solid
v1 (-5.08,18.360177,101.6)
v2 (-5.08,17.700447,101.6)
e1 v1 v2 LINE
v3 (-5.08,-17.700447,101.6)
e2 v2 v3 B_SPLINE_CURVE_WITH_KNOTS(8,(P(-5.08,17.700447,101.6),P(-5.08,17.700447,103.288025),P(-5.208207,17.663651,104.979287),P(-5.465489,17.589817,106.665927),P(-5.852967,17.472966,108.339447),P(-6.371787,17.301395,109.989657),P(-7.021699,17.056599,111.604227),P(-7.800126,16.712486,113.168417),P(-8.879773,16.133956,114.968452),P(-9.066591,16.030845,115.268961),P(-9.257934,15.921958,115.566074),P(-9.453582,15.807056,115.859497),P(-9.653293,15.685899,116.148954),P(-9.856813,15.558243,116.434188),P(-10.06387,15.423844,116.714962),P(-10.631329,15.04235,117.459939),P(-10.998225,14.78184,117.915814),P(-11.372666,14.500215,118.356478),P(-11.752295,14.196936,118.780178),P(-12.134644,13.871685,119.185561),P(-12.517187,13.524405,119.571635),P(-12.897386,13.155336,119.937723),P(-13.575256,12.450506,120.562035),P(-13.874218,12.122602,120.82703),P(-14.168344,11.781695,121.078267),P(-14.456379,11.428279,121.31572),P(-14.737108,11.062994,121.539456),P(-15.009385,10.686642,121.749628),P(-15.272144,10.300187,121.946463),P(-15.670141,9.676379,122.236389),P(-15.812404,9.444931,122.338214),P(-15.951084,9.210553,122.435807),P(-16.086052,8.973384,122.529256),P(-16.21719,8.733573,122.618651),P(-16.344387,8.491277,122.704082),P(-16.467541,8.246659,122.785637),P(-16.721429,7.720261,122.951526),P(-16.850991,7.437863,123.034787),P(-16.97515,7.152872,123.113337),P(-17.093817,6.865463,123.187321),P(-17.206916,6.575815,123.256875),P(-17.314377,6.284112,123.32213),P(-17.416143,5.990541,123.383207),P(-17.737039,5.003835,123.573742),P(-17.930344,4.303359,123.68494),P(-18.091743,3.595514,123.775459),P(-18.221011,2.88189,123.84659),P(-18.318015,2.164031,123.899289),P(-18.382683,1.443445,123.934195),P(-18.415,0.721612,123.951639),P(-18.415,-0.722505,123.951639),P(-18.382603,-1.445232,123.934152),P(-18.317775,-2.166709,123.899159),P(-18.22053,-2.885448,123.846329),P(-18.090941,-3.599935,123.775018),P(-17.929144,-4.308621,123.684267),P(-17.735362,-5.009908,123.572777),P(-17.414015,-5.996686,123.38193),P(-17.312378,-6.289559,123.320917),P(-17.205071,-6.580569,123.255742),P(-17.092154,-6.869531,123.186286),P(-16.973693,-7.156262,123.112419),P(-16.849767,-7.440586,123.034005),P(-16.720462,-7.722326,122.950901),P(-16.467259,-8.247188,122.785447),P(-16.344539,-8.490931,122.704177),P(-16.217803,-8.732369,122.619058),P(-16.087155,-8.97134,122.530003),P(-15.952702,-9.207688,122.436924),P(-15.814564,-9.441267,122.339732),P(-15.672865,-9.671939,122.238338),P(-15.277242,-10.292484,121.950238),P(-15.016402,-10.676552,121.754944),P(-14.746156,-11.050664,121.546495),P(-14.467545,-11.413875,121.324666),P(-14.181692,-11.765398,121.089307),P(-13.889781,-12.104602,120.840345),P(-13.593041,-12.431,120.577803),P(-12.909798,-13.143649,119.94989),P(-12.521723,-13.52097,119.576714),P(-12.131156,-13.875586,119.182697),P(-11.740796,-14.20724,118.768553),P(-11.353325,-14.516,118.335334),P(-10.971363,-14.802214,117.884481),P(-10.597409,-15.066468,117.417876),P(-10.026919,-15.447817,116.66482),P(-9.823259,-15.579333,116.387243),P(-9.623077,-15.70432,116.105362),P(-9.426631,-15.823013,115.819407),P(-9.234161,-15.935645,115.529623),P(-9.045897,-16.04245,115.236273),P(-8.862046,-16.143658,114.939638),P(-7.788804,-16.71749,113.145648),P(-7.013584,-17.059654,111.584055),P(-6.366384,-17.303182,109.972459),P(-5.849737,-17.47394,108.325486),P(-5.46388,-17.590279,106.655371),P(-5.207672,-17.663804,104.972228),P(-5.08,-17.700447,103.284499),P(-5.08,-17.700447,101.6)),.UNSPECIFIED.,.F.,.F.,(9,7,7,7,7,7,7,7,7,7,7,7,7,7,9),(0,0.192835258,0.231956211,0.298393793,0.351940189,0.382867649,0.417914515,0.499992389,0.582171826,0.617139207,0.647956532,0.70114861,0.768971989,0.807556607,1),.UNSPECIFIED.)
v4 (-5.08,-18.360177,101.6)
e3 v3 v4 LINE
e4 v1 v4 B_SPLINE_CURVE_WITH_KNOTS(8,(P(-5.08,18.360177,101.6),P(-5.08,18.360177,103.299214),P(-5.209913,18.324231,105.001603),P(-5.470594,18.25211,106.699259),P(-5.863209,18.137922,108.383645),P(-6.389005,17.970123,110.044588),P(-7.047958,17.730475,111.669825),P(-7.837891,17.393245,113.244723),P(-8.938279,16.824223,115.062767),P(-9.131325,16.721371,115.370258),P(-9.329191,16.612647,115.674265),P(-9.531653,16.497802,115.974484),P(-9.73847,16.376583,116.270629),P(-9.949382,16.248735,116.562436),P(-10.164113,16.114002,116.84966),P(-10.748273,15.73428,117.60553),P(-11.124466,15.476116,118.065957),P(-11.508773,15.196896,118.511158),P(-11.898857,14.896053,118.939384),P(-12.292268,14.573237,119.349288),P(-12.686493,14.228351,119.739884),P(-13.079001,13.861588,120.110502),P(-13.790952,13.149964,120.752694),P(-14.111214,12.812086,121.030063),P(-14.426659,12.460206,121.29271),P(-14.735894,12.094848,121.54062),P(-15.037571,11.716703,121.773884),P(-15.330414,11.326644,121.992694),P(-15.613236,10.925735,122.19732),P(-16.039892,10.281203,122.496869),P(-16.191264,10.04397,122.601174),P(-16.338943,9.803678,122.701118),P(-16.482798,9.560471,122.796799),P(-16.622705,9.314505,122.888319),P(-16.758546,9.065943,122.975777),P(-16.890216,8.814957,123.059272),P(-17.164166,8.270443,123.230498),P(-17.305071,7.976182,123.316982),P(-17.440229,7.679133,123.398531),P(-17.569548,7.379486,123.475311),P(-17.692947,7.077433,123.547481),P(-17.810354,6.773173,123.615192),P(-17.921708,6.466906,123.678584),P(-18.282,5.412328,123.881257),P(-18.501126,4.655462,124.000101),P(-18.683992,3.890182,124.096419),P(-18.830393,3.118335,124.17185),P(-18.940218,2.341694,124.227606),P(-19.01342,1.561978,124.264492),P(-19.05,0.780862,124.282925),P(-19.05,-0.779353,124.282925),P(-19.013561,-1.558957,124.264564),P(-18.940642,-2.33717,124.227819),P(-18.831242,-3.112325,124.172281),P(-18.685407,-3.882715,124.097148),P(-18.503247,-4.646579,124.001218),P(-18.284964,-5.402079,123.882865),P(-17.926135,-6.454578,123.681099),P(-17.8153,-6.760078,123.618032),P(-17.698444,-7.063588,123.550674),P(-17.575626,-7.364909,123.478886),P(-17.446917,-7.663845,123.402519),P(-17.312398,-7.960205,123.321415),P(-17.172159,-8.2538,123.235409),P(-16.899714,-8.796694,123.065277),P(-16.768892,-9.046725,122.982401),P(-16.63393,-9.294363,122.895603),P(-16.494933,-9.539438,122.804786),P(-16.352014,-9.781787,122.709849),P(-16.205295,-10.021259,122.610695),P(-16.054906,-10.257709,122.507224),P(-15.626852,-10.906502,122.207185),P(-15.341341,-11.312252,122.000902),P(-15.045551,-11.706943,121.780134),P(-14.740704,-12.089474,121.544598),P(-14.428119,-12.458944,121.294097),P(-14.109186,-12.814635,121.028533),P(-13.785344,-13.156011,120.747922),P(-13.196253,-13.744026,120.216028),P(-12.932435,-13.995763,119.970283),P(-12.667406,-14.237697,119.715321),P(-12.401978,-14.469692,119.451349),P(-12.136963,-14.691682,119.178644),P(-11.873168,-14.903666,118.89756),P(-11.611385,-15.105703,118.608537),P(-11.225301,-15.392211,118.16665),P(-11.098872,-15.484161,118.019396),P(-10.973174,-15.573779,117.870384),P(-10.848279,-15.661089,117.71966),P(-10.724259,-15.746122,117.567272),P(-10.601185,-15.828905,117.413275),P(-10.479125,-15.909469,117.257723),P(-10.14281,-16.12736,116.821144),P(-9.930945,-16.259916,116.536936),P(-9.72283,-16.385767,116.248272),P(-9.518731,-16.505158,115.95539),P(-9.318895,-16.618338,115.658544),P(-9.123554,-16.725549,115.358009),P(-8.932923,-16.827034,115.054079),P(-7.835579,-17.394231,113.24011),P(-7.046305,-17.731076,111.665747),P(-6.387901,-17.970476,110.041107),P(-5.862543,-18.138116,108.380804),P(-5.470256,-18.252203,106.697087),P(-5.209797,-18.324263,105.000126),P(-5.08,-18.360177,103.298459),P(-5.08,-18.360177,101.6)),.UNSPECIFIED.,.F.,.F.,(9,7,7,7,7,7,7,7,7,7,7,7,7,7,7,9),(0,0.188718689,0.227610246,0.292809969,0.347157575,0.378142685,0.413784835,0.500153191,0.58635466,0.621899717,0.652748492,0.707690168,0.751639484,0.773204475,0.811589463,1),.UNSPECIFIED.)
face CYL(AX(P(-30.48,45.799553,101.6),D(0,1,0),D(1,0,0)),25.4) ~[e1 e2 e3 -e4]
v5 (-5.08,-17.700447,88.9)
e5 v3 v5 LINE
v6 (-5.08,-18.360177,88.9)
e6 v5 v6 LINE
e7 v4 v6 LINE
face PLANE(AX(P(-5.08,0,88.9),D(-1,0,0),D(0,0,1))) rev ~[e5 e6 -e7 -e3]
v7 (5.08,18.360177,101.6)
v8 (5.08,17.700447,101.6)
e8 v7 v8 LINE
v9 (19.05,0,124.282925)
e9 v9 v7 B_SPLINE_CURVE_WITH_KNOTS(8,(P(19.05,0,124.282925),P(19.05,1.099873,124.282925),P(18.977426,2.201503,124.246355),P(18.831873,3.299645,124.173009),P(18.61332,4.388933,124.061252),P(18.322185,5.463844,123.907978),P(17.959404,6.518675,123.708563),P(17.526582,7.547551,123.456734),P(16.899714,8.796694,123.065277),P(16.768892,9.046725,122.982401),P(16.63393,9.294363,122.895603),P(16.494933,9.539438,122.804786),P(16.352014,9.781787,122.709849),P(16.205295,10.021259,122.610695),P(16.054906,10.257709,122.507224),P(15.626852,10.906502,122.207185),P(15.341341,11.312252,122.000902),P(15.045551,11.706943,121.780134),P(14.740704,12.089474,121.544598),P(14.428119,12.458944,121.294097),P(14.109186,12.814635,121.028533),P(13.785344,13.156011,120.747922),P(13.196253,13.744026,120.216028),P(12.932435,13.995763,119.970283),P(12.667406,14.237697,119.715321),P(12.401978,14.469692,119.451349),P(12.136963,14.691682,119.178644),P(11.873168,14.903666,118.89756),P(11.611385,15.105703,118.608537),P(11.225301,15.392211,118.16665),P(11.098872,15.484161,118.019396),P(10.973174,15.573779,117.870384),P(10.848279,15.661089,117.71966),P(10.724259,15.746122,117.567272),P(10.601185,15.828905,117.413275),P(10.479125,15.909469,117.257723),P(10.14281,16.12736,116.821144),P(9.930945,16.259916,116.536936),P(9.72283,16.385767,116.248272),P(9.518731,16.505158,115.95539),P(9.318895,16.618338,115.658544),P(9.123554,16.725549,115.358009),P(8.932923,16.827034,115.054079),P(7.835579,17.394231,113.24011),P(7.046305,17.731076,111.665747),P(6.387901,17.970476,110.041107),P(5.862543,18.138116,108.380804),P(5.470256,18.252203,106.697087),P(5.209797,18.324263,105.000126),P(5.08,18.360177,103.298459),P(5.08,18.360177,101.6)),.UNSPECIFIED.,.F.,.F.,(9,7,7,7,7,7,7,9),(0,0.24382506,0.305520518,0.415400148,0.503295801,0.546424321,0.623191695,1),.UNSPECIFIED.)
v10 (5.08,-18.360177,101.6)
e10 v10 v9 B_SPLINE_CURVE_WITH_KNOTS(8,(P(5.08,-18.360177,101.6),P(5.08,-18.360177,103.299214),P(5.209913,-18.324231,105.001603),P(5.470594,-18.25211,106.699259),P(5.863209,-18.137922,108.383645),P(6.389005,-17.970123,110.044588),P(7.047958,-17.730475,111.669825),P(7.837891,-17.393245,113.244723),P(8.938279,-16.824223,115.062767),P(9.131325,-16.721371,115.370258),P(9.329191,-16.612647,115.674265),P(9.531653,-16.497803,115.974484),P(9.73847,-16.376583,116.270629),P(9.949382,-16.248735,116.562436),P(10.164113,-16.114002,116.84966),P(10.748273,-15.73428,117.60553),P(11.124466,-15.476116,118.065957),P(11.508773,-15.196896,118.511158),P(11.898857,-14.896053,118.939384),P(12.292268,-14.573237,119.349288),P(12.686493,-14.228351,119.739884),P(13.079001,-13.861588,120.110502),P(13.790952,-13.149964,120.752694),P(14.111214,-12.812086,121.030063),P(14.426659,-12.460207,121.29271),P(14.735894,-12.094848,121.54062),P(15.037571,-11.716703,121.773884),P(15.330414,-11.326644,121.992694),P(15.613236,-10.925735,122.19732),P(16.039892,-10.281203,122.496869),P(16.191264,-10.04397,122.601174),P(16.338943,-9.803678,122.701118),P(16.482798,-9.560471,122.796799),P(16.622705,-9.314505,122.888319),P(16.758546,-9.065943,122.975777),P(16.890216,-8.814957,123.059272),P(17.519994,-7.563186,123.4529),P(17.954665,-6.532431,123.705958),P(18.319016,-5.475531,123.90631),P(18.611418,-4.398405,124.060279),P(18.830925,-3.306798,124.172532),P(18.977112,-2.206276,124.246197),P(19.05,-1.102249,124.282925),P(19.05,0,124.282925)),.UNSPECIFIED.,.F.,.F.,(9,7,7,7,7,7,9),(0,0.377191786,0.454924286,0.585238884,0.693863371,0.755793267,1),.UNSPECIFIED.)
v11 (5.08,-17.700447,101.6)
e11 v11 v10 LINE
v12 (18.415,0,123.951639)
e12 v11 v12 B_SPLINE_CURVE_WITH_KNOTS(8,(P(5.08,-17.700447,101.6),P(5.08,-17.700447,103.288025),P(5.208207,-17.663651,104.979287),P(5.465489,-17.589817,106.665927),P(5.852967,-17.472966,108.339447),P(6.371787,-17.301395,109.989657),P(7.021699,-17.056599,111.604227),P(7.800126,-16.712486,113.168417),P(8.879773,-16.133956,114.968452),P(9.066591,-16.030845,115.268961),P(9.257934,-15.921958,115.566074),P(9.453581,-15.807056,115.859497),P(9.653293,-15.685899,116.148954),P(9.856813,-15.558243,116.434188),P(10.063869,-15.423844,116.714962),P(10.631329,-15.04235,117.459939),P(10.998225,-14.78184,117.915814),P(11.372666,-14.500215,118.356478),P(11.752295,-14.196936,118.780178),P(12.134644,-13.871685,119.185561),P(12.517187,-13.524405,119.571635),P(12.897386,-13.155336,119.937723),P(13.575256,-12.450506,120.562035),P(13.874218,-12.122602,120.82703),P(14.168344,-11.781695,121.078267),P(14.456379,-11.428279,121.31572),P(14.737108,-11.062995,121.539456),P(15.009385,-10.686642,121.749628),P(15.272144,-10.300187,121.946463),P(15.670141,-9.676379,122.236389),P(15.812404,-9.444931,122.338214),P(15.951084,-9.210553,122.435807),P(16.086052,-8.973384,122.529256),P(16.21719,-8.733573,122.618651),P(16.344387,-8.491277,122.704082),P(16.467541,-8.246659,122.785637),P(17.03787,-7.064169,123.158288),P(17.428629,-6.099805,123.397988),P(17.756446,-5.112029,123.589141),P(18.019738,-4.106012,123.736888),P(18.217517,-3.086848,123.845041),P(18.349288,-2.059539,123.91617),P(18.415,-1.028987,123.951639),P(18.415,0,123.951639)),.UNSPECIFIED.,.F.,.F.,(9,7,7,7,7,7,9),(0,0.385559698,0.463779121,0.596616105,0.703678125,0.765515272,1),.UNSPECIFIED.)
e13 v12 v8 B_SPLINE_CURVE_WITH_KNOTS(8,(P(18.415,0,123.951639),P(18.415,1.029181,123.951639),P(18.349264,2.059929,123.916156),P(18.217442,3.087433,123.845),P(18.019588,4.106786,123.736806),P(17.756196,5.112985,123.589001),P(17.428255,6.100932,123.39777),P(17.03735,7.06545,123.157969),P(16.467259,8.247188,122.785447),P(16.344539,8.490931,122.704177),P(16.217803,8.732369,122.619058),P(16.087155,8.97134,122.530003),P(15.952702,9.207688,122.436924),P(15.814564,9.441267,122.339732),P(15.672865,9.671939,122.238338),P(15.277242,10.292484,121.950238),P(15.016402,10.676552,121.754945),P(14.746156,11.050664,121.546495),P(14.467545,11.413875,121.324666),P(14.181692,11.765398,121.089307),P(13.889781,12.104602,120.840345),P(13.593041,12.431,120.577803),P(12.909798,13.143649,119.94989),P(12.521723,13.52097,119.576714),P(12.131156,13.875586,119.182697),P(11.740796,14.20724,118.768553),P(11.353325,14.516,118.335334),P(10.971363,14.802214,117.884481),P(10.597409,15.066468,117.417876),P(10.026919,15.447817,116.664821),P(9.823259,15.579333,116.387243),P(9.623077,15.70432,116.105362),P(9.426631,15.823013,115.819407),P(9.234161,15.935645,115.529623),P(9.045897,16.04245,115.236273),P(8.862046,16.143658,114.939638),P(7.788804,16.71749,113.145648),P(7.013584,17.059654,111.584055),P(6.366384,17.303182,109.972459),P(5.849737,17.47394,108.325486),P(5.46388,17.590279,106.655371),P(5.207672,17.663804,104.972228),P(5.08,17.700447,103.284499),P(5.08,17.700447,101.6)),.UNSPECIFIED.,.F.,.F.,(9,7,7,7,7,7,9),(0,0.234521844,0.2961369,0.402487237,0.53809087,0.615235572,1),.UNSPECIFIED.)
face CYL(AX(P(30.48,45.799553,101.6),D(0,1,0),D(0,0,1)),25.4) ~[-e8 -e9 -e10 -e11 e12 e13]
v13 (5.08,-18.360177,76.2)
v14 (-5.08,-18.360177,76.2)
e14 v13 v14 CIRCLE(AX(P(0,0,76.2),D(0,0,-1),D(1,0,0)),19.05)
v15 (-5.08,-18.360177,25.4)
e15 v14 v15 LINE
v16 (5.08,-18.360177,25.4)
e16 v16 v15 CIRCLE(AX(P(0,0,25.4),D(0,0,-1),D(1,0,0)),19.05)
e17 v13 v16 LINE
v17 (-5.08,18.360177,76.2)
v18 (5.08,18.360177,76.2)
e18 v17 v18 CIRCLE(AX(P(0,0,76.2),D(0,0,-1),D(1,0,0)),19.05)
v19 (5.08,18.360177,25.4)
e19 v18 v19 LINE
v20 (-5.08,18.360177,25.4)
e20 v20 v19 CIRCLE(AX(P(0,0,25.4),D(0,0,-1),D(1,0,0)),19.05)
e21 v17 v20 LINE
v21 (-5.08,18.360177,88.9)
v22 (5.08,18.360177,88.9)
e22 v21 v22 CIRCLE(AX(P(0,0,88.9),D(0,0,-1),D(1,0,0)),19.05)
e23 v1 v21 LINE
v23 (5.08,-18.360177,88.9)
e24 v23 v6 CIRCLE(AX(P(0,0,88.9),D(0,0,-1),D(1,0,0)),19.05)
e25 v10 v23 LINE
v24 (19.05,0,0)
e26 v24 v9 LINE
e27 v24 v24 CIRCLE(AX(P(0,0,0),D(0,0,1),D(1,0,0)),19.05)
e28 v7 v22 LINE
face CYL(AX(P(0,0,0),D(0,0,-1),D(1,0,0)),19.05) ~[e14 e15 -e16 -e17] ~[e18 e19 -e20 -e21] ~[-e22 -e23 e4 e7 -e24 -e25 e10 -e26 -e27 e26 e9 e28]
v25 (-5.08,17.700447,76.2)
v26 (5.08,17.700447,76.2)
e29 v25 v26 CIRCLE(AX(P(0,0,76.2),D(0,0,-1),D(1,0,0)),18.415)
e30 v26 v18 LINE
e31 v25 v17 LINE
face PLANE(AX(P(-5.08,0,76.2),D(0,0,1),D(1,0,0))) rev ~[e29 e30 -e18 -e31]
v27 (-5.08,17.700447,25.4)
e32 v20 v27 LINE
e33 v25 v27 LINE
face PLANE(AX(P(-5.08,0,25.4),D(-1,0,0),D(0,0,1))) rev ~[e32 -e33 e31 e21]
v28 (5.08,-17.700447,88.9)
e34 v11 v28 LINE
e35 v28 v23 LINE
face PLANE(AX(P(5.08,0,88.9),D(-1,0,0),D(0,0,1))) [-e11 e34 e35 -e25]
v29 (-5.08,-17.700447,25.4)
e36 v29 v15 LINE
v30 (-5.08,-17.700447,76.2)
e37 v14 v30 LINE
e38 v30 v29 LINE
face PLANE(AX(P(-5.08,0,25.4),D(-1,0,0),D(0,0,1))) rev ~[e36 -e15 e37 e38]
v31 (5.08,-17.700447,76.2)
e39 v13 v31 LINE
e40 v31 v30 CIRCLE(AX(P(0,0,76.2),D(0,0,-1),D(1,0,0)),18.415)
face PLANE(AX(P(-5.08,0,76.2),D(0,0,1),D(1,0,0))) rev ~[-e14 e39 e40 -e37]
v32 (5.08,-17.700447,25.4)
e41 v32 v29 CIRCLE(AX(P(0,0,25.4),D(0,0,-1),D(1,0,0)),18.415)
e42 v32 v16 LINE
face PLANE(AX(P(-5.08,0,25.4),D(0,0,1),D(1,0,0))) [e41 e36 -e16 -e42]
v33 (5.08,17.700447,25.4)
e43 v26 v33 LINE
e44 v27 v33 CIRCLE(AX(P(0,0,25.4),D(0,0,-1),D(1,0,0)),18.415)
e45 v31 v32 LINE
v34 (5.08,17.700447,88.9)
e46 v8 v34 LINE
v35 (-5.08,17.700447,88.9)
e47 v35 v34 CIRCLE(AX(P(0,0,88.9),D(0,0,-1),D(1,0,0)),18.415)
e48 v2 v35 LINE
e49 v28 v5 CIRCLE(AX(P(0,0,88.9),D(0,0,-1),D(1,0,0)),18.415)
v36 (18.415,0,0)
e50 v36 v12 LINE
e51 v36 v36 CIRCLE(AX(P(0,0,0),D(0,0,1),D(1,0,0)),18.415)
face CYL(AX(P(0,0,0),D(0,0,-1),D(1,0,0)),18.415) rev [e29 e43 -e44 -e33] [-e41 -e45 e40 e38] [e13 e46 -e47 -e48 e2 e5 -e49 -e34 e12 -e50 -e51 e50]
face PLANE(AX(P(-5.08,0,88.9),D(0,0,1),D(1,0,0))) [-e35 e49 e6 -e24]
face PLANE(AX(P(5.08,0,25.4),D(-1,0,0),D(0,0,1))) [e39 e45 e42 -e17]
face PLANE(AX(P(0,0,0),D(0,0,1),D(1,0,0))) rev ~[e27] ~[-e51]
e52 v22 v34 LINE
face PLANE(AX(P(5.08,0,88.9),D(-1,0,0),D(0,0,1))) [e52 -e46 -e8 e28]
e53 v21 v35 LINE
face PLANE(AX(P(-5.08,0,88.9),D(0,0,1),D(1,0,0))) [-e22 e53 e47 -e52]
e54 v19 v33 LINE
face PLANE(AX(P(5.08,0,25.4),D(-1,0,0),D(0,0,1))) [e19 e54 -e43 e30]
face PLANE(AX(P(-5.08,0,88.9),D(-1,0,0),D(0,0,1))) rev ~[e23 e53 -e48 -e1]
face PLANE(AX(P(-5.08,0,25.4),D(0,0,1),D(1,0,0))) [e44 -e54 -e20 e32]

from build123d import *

# Parameters (mm, degrees)
F0_R        = 19.05
F1_DEPTH    = 127
F2_T        = -0.635
F3_W        = 10.16
F3_H        = 50.8
F3_H_2      = 127
F4_DEPTH    = 38.1
F5_T1_DEPTH = 127.6597299865
F5_T3_DEPTH = 127.6597299858
F5_T5_DEPTH = 127.6597299858
F5_T7_DEPTH = 127.6597299865


# Not quite as in the source:
# - a fillet or chamfer that OpenCascade refuses, or shapes differently, is made with other operations: its cross-section is extruded or revolved along the edge and cut away or added


with BuildPart() as f1:
    # F0 (on Top) → F1 (new body)
    with BuildSketch(Plane.XY):
        Circle(F0_R)
    extrude(amount=F1_DEPTH)

    # F2
    f2_openings = [f1.faces().sort_by_distance(p)[0] for p in [
        (0, 0, 0),
        (0, 0, 127),
    ]]
    offset(amount=F2_T, openings=f2_openings)

    # F3 (on Front) → F4 (cut, symmetric)
    with BuildSketch(Plane.XZ):
        with Locations((0, 50.8)):
            Rectangle(F3_W, F3_H)
        with Locations((-3.17e-08, 114.3)):
            Rectangle(F3_W, F3_H)
        with Locations((-0.4444076066, 213.36)):
            Rectangle(F3_W, F3_H_2)
    extrude(amount=F4_DEPTH, both=True, mode=Mode.SUBTRACT)

    # F5: fillet of radius 25.4 on 4 edges, made by hand

    # F5_s2 → F5_t1 (cut)
    with BuildSketch(Plane.XZ.offset(-45.7995529809)):
        with BuildLine():
            ThreePointArc((-5.0800000317, 101.6), (-12.5194877896, 119.5605122421), (-30.4800000317, 127))
            Line((-30.4800000317, 127), (-5.0800000317, 127))
            Line((-5.0800000317, 127), (-5.0800000317, 101.6))
        make_face()
    extrude(amount=F5_T1_DEPTH, mode=Mode.SUBTRACT)

    # F5_s4 → F5_t3 (cut)
    with BuildSketch(Plane.XZ.offset(-45.7995529626)):
        with BuildLine():
            ThreePointArc((30.4799999683, 127), (12.5194877261, 119.5605122421), (5.0799999683, 101.6))
            Line((5.0799999683, 101.6), (5.0799999683, 127))
            Line((5.0799999683, 127), (30.4799999683, 127))
        make_face()
    extrude(amount=F5_T3_DEPTH, mode=Mode.SUBTRACT)

    # F5_s6 → F5_t5 (cut)
    with BuildSketch(Plane.XZ.offset(-81.8601770232)):
        with BuildLine():
            ThreePointArc((30.4799999683, 127), (12.5194877261, 119.5605122421), (5.0799999683, 101.6))
            Line((5.0799999683, 101.6), (5.0799999683, 127))
            Line((5.0799999683, 127), (30.4799999683, 127))
        make_face()
    extrude(amount=F5_T5_DEPTH, mode=Mode.SUBTRACT)

    # F5_s8 → F5_t7 (cut)
    with BuildSketch(Plane.XZ.offset(-81.8601770056)):
        with BuildLine():
            ThreePointArc((-30.4800000317, 127), (-12.5194877896, 119.5605122421), (-5.0800000317, 101.6))
            Line((-5.0800000317, 101.6), (-5.0800000317, 127))
            Line((-5.0800000317, 127), (-30.4800000317, 127))
        make_face()
    extrude(amount=F5_T7_DEPTH, mode=Mode.SUBTRACT)


solid = f1.part
